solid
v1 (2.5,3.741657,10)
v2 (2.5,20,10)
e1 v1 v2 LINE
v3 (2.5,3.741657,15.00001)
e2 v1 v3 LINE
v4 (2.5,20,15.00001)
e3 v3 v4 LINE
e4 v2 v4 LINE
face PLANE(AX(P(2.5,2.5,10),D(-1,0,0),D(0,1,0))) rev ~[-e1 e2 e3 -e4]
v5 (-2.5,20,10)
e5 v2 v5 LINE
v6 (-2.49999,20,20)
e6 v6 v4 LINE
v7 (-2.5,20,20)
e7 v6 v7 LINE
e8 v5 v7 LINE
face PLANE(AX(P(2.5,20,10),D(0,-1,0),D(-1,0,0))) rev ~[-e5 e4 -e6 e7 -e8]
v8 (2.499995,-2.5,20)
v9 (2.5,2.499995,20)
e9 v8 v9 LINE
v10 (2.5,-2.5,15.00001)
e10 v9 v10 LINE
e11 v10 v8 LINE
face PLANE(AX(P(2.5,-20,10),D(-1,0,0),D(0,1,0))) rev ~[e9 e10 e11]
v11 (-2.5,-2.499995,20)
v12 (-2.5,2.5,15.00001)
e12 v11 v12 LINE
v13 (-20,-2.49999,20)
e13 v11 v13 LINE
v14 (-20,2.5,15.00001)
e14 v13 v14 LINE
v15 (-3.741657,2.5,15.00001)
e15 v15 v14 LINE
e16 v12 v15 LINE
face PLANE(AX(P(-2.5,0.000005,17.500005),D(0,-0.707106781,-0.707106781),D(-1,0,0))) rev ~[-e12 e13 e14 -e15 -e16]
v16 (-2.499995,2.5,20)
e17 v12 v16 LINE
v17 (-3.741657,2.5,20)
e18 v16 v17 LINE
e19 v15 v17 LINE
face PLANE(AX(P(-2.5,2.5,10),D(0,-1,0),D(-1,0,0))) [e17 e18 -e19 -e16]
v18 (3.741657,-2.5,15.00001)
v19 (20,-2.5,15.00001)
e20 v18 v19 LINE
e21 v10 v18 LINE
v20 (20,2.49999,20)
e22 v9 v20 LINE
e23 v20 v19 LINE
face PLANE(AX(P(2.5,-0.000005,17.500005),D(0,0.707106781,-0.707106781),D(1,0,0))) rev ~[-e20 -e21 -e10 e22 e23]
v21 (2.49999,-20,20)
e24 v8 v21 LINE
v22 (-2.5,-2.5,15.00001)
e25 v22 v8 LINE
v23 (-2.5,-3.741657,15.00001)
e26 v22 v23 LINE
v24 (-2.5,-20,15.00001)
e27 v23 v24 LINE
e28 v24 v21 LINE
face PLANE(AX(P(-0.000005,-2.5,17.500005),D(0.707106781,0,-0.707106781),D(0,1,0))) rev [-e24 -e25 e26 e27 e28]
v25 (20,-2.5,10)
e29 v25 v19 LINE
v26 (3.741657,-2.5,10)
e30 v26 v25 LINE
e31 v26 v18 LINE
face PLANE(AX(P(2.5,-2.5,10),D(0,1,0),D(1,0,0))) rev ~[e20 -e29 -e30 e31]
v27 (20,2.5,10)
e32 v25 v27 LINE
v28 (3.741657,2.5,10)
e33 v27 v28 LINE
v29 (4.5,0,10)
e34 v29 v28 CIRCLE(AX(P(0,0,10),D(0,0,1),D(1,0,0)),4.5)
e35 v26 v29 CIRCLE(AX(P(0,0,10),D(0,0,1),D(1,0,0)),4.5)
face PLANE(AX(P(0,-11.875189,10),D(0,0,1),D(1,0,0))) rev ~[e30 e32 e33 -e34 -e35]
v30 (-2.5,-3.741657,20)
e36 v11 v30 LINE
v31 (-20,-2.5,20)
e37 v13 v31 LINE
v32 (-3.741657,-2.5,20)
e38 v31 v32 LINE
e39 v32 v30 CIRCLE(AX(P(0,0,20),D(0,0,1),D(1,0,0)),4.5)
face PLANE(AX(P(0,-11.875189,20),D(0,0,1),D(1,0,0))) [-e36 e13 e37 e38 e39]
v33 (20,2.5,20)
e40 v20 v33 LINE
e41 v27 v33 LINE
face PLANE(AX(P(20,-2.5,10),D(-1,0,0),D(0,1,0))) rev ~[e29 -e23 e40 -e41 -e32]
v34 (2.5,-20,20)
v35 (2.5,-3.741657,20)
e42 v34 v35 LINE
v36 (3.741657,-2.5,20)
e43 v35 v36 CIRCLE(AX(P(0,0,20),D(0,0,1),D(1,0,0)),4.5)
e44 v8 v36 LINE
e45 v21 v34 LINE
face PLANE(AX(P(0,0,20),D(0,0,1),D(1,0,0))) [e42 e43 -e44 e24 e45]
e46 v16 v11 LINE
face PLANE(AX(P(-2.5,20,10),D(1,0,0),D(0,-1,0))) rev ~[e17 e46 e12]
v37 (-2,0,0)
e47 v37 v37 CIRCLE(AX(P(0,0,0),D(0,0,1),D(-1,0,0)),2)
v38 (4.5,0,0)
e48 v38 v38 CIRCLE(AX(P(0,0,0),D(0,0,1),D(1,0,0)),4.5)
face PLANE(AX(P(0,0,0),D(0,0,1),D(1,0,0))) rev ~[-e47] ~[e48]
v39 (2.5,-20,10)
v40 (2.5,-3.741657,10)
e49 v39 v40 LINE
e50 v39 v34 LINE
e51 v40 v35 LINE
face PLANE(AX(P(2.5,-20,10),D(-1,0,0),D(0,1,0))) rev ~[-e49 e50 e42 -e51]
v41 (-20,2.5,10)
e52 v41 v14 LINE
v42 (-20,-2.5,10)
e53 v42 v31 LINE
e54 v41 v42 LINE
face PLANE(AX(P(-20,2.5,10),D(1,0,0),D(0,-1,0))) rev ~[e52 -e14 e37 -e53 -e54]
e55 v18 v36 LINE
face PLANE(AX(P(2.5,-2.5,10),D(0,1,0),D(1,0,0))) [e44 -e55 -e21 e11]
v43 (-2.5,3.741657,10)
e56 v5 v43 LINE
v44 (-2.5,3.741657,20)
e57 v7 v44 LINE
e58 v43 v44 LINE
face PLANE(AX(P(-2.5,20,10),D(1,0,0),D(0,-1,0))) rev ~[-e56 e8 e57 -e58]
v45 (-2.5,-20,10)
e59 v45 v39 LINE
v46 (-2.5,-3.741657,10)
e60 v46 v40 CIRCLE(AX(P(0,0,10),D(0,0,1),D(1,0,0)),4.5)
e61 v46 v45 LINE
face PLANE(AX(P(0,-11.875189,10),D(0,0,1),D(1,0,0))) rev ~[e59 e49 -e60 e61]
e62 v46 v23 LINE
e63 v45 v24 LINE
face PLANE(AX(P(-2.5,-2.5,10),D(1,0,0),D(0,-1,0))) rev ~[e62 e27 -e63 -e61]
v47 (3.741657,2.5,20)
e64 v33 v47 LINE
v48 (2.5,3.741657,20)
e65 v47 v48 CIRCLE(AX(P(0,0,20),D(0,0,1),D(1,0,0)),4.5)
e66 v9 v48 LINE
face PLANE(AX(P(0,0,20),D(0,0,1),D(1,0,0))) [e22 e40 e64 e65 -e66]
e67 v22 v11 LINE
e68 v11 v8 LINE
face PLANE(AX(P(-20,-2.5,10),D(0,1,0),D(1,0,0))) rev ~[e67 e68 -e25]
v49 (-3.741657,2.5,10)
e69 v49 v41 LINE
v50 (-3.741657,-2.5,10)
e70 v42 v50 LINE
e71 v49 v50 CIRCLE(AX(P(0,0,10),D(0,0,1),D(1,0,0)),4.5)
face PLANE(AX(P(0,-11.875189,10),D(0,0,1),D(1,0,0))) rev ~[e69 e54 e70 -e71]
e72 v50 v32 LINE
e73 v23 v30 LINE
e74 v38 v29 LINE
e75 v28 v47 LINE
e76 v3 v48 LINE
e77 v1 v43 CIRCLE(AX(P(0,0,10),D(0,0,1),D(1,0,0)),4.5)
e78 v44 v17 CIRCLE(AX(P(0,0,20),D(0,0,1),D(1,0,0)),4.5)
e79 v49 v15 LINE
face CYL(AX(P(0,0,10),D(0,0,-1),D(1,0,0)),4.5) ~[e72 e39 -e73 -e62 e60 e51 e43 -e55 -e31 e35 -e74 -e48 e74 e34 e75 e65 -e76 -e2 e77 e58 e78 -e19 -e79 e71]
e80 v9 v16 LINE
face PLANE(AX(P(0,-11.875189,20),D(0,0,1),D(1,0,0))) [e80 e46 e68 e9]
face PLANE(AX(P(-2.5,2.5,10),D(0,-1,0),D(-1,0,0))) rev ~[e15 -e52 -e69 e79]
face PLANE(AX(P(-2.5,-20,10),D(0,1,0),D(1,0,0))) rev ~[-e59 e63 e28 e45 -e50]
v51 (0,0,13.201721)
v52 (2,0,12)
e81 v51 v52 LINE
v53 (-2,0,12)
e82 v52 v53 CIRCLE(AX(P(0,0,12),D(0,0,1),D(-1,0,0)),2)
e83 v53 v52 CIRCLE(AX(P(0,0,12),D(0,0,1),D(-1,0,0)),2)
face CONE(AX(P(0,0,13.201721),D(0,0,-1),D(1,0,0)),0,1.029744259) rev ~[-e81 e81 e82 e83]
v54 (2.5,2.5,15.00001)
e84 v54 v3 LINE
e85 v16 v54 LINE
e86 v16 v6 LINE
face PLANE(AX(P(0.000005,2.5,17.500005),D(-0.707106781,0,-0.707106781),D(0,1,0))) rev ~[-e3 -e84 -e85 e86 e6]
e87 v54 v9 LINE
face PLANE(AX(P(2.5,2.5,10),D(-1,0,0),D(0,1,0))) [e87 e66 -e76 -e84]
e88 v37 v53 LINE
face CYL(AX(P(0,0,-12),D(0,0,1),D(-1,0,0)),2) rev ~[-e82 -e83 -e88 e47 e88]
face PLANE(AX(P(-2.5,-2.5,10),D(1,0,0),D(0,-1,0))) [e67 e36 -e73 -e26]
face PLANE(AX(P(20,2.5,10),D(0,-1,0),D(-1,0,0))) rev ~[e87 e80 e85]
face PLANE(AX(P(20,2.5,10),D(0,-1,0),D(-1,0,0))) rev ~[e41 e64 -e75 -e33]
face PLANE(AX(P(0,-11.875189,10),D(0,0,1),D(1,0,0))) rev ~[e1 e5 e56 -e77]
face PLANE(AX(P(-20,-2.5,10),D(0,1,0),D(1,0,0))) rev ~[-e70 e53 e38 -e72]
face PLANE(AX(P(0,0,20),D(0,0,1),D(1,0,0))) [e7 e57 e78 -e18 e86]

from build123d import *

# Parameters (mm, degrees)
F0_R     = 4.5
F1_DEPTH = 10
F2_W     = 5
F2_H     = 5
F3_DEPTH = 10
F4_SIZE  = 4.99999
F5_DEPTH = 10
F7_D     = 4
F7_DEPTH = 12
F7_TIP   = 1.2017212381


# Not quite as in the source:
# - a fillet or chamfer is up to 0.001 mm smaller than in the source, because OpenCascade refuses the exact size


with BuildPart() as f1:
    # F0 (on Top) → F1 (new body)
    with BuildSketch(Plane.XY):
        Circle(F0_R)
    extrude(amount=F1_DEPTH)

    # F2 (on face) → F3 (join)
    with BuildSketch(Plane.XY.offset(10)):
        with BuildLine():
            ThreePointArc((2.5, -3.7416573868), (0, -4.5), (-2.5, -3.7416573868))
            Line((-2.5, -3.7416573868), (-2.5, -20))
            Line((-2.5, -20), (2.5, -20))
            Line((2.5, -20), (2.5, -3.7416573868))
        make_face()
        with BuildLine():
            Line((-3.7416573868, 2.5), (-20, 2.5))
            Line((-20, 2.5), (-20, -2.5))
            Line((-20, -2.5), (-3.7416573868, -2.5))
            ThreePointArc((-3.7416573868, -2.5), (-4.5, 0), (-3.7416573868, 2.5))
        make_face()
        with BuildLine():
            Line((-2.5, 20), (-2.5, 3.7416573868))
            ThreePointArc((-2.5, 3.7416573868), (0, 4.5), (2.5, 3.7416573868))
            Line((2.5, 3.7416573868), (2.5, 20))
            Line((2.5, 20), (-2.5, 20))
        make_face()
        with BuildLine():
            Line((20, 2.5), (3.7416573868, 2.5))
            ThreePointArc((3.7416573868, 2.5), (4.3062430401, 1.3062430401), (4.5, 0))
            ThreePointArc((4.5, 0), (4.3062430401, -1.3062430401), (3.7416573868, -2.5))
            Line((3.7416573868, -2.5), (20, -2.5))
            Line((20, -2.5), (20, 2.5))
        make_face()
        with BuildLine():
            Line((3.7416573868, 2.5), (2.5, 2.5))
            Line((2.5, 2.5), (2.5, -2.5))
            Line((2.5, -2.5), (3.7416573868, -2.5))
            ThreePointArc((3.7416573868, -2.5), (4.3062430401, -1.3062430401), (4.5, 0))
            ThreePointArc((4.5, 0), (4.3062430401, 1.3062430401), (3.7416573868, 2.5))
        make_face()
        Rectangle(F2_W, F2_H)
        with BuildLine():
            Line((2.5, -2.5), (-2.5, -2.5))
            Line((-2.5, -2.5), (-2.5, -3.7416573868))
            ThreePointArc((-2.5, -3.7416573868), (0, -4.5), (2.5, -3.7416573868))
            Line((2.5, -3.7416573868), (2.5, -2.5))
        make_face()
        with BuildLine():
            Line((-2.5, 2.5), (-3.7416573868, 2.5))
            ThreePointArc((-3.7416573868, 2.5), (-4.5, 0), (-3.7416573868, -2.5))
            Line((-3.7416573868, -2.5), (-2.5, -2.5))
            Line((-2.5, -2.5), (-2.5, 2.5))
        make_face()
        with BuildLine():
            Line((-2.5, 3.7416573868), (-2.5, 2.5))
            Line((-2.5, 2.5), (2.5, 2.5))
            Line((2.5, 2.5), (2.5, 3.7416573868))
            ThreePointArc((2.5, 3.7416573868), (0, 4.5), (-2.5, 3.7416573868))
        make_face()
    extrude(amount=F3_DEPTH)

    # F4 (size 5 in the source; OpenCascade refuses exactly that, so slightly less here)
    f4_edges = [f1.edges().sort_by_distance(p)[0] for p in [
        (-2.5, -11.25, 20),
        (-11.25, 2.5, 20),
        (2.5, 11.25, 20),
        (11.25, -2.5, 20),
    ]]
    chamfer(f4_edges, length=F4_SIZE)

    # F5 (add): faces of the model
    f5_faces = [f1.faces().sort_by_distance(p)[0] for p in [
        (-2.940797231, 2.940797231, 10),
        (2.940797231, 2.940797231, 10),
        (2.940797231, -2.940797231, 10),
        (-2.940797231, -2.940797231, 10),
    ]]
    extrude(f5_faces, amount=F5_DEPTH)

    # F7
    with Locations(Plane(origin=(0, 0, 0), x_dir=(1, 0, 0), z_dir=(0, 0, -1))):
        with Locations((0, 0)):
            Hole(F7_D / 2, depth=F7_DEPTH)
            with Locations((0, 0, -(F7_DEPTH + F7_TIP / 2))):  # 118° drill point
                Cone(0, F7_D / 2, F7_TIP, mode=Mode.SUBTRACT)


solid = f1.part
